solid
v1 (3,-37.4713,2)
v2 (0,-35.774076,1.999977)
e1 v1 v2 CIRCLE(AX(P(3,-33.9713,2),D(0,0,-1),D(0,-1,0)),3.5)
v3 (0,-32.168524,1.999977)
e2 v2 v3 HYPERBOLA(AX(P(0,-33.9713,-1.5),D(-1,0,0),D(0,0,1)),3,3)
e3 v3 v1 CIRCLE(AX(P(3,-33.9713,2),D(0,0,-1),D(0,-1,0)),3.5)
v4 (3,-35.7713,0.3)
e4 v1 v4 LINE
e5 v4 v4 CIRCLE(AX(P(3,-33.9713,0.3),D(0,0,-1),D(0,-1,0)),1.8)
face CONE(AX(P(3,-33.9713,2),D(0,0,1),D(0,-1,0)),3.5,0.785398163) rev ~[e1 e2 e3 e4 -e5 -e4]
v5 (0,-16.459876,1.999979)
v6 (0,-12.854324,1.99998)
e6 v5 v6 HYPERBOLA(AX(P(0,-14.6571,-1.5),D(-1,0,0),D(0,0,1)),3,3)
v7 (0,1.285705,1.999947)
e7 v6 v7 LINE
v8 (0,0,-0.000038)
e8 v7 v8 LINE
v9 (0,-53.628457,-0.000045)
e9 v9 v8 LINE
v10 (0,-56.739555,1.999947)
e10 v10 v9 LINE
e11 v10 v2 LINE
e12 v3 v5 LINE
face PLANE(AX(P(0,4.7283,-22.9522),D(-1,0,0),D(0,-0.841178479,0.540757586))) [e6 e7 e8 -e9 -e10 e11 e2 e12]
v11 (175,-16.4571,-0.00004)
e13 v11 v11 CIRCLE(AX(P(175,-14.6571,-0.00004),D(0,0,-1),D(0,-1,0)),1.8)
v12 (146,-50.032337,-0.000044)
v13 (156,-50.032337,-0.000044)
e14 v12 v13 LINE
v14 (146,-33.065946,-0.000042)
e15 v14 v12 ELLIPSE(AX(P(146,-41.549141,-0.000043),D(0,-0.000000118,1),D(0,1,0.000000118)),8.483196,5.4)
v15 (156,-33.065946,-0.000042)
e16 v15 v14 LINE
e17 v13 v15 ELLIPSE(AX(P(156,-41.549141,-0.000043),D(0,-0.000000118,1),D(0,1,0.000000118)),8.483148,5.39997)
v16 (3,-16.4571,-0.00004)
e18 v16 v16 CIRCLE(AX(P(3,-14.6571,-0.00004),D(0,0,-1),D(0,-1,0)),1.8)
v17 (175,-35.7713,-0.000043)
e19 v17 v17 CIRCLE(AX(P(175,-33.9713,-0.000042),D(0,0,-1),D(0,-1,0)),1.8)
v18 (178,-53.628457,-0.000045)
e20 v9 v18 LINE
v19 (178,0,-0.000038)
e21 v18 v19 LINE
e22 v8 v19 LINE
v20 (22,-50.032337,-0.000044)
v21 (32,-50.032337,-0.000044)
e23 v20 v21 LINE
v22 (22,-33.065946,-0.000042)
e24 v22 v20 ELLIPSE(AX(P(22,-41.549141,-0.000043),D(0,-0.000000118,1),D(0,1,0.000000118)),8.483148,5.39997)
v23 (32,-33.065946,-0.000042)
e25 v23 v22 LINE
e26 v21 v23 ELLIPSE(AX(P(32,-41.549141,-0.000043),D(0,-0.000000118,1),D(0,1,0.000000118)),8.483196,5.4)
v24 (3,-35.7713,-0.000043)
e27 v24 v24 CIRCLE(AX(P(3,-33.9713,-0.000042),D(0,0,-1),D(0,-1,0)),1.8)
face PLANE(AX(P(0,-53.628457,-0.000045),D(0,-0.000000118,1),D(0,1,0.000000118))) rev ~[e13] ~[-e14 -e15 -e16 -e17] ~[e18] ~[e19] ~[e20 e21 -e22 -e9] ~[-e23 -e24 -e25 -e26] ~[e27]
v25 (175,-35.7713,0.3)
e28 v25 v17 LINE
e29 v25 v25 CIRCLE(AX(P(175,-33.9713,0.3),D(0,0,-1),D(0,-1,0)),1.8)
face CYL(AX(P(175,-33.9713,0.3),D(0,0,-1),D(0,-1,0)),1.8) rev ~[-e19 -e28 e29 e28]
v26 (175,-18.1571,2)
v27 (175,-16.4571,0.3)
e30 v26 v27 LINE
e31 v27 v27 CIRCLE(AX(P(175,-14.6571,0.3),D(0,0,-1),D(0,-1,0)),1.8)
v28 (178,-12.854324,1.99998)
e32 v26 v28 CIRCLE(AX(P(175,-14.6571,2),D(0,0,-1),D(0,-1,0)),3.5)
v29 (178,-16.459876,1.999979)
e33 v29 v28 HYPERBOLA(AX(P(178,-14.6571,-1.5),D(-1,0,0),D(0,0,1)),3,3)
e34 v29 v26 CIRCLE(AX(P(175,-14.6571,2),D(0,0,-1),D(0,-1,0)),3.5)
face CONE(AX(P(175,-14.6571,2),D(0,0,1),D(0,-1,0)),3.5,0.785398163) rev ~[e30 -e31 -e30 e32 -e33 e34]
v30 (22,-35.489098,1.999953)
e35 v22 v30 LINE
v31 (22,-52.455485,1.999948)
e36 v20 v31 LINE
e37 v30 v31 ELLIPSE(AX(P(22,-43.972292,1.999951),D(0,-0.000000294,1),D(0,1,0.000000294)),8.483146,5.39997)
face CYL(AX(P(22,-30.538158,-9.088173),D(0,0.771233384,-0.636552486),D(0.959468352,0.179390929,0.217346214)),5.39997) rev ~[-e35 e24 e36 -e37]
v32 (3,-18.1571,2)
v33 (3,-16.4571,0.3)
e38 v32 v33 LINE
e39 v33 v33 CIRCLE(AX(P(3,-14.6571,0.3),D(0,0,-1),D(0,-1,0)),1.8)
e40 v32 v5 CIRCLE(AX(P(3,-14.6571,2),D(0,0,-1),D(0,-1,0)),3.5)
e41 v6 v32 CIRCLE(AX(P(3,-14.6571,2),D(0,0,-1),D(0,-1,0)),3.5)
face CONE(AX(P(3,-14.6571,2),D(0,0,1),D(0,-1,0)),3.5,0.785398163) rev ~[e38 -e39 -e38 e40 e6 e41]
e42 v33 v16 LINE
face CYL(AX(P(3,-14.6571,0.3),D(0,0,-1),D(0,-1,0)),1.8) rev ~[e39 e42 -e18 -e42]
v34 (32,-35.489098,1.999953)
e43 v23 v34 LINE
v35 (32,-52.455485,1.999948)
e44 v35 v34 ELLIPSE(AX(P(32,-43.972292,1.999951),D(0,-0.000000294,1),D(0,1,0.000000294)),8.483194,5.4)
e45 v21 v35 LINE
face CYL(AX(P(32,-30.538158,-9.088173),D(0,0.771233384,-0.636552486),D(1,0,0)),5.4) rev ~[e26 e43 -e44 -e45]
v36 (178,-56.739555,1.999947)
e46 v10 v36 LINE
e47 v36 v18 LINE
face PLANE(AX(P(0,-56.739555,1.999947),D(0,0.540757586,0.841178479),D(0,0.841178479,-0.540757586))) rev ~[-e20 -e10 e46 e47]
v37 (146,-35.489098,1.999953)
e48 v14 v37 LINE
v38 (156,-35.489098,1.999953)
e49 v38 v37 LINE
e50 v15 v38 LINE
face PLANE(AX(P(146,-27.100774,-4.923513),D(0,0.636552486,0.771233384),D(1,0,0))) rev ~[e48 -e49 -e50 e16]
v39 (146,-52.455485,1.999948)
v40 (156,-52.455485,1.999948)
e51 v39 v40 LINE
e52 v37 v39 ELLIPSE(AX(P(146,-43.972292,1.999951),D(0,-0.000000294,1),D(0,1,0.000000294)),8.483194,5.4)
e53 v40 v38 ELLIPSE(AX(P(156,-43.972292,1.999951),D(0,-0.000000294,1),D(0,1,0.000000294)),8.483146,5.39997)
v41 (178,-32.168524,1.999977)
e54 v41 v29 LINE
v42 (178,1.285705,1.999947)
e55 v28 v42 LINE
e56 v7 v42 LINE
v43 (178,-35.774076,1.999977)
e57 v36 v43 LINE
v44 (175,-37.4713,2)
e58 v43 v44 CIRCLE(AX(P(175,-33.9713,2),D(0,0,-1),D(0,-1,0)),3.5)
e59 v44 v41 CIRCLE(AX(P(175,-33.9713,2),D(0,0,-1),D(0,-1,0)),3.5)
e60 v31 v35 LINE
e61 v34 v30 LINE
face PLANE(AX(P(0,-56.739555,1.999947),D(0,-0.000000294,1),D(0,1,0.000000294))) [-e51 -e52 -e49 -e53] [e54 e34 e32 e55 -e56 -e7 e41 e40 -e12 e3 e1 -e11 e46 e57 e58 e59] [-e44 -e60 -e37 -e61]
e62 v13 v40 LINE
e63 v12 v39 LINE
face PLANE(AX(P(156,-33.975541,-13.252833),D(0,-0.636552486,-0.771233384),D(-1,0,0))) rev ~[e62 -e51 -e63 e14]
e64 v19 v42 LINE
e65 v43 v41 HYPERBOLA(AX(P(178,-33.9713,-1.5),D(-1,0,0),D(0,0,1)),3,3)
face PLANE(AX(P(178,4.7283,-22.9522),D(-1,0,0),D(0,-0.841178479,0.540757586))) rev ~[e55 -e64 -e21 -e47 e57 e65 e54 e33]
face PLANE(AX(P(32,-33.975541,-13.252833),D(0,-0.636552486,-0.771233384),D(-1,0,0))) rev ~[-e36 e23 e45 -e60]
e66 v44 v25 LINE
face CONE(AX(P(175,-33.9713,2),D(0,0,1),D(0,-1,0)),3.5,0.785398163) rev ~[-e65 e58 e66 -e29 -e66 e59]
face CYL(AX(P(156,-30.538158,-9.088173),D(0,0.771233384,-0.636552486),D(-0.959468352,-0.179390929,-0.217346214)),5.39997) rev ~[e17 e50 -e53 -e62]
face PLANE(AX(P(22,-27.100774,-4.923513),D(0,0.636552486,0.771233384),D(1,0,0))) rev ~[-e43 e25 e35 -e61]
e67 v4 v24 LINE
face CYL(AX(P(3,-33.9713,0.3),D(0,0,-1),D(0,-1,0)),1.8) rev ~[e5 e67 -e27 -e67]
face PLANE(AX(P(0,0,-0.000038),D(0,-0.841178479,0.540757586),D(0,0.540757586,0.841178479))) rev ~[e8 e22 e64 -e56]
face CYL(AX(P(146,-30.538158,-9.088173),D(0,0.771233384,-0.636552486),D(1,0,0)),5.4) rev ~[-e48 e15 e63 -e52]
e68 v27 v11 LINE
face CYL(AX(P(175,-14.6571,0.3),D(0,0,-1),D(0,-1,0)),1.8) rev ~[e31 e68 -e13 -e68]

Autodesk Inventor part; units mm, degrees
ref_plane "YZ Plane" through (0, 0, 0) normal (1, 0, 0) x (0, 1, 0)
ref_plane "XZ Plane" through (0, 0, 0) normal (0, 1, 0) x (-1, 0, 0)
ref_plane "Work Plane1" through (0, 4.7283, -22.9522) normal (-1, 0, 0) x (0, -0.8411785, 0.5407576)
sketch "Sketch1" plane through (0, 4.7283, -22.9522) normal (-1, 0, 0) x (0, -0.8411785, 0.5407576)
  line L0 (-61.5, -16.75) -> (-59.949, -16.75) projected
  line L1 (61.5, -12.25) -> (61.5, -16.75) projected
  line L2 (61.5, -16.75) -> (65.5, -16.75) projected
  line L3 (65.5, -16.75) -> (65.5, -20.25) projected
  line L4 (65.5, -20.25) -> (79.5, -20.25) projected
  line L5 (79.5, -20.25) -> (65.5, -11.25) projected
  line L6 (65.5, -11.25) -> (65.5, -12.25) projected
  line L7 (65.5, -12.25) -> (61.5, -12.25) projected
  line L8 (16.3889, 16.75) -> (16.3889, 18.75) projected
  line L9 (14.3494, 18.75) -> (16.3889, 18.75)
  line L10 (65.1985, -12.25) -> (12.6206, 21.5501)
  line L11 (16.3889, 16.75) -> (16.3889, 19.1276)
  arc A0 (-61.5, -15.199) -> (-59.949, -16.75) centre (-58.75, -14) ccw projected
  line L12 (-61.5, -15.199) -> (-61.5, -16.75) projected
  arc A1 (-57.551, -16.75) -> (-61.5, -12.801) centre (-58.75, -14) ccw projected
  line L13 (-57.551, -16.75) -> (-36.699, -16.75) projected
  arc A2 (-34.301, -16.75) -> (-36.699, -16.75) centre (-35.5, -14) ccw projected
  line L14 (-34.301, -16.75) -> (61.5, -16.75) projected
  line L15 (61.5, -16.75) -> (61.5, -12.25) projected
  line L16 (61.5, -12.25) -> (16.3889, 16.75) projected
  line L17 (16.3889, 16.75) -> (-61.5, 16.75) projected
  line L18 (-61.5, 16.75) -> (-61.5, -12.801) projected
  point P0 (15.3691, 18.75)
  dimension "d14" = 2
  dimension "d15" = 2
ref_plane "Work Plane2" through (178, -56.0619, -70.2985) normal (1, 0, 0) x (0, 0.8411785, -0.5407576)
extrude "Extrusion1" add sketch "Sketch1" against normal up to surface (178 mm away) contours L16 L8 L11 L10 L7
sketch "Sketch2" plane through (0, -56.7396, 2) normal (0, 0, 1) x (1, 0, 0)
  circle A0 centre (3, 22.7682) radius 2.5 projected
  circle A1 centre (3, 42.0825) radius 2.5 projected
  line L0 (0, 3.1111) -> (0, 56.7396) projected
  line L1 (0, 3.1111) -> (6, 3.1111) projected
  line L2 (6, 56.7396) -> (6, 3.1111) projected
  line L3 (0, 56.7396) -> (6, 56.7396) projected
  circle A2 centre (175, 22.7682) radius 2.5 projected
  circle A3 centre (175, 42.0825) radius 2.5 projected
  line L4 (178, 3.1111) -> (178, 56.7396) projected
  line L5 (178, 56.7396) -> (172, 56.7396) projected
  line L6 (172, 56.7396) -> (172, 3.1111) projected
  line L7 (178, 3.1111) -> (172, 3.1111) projected
hole "Hole1" at (3, -14.6571, 2) at (3, -33.9713, 2) at (175, -33.9713, 2) at (175, -14.6571, 2) direction (0, 0, -1) diameter 3.6 end through all countersink diameter 7 countersink angle 90 clearance for "Countersunk Flat Head Screw ISO 2009/7046" size "M3" standard "ISO"
ref_plane "Work Plane3" through (22, -30.5397, -9.0869) normal (0, -0.7712334, 0.6365525) x (1, 0, 0)
sketch "Sketch3" plane through (22, -30.5397, -9.0869) normal (0, -0.7712334, 0.6365525) x (1, 0, 0)
  line L0 (-9.9215, 5.4518) -> (-9.9215, -5.4534)
  spline S0 degree 3 poles (-9.9215, -5.4534) (-9.9222, -5.5772) (-9.8204, -5.8209) (-9.5772, -5.9222) (-9.4534, -5.9215) knots 0 0 0 0 0.5 1 1 1 1
  line L1 (-9.4534, -5.9215) -> (19.4534, -5.9215)
  spline S1 degree 3 poles (19.4534, -5.9215) (19.5775, -5.9222) (19.8219, -5.82) (19.9222, -5.5758) (19.9215, -5.4518) knots 0 0 0 0 0.5 1 1 1 1
  line L2 (19.9215, -5.4518) -> (19.9215, 5.4534)
  spline S2 degree 3 poles (19.9215, 5.4534) (19.9222, 5.5775) (19.82, 5.8219) (19.5758, 5.9222) (19.4518, 5.9215) knots 0 0 0 0 0.5 1 1 1 1
  line L3 (19.4518, 5.9215) -> (-9.4534, 5.9215)
  spline S3 degree 3 poles (-9.4534, 5.9215) (-9.5775, 5.9222) (-9.8219, 5.82) (-9.9222, 5.5758) (-9.9215, 5.4518) knots 0 0 0 0 0.5 1 1 1 1
  circle A0 centre (-8.3791, -4.3791) radius 0.5
  circle A1 centre (-8.3791, 4.3791) radius 0.5
  circle A2 centre (18.3791, 4.3791) radius 0.5
  circle A3 centre (18.3791, -4.3791) radius 0.5
  arc A4 (5.2617, -1.4512) -> (5.1811, -1.5218) centre (5.2771, -1.55) ccw
  arc A5 (5.1811, 1.5218) -> (5.1811, -1.5218) centre (0, 0) ccw
  arc A6 (5.1811, 1.5218) -> (5.2617, 1.4512) centre (5.2771, 1.55) ccw
  arc A7 (5.2617, 1.4512) -> (5.3414, 1.519) centre (5.2463, 1.55) ccw
  arc A8 (5.3414, -1.519) -> (5.3414, 1.519) centre (10, 0) ccw
  arc A9 (5.3414, -1.519) -> (5.2617, -1.4512) centre (5.2463, -1.55) ccw
  line L4 (143.9215, 5.4518) -> (143.9215, -5.4534)
  spline S4 degree 3 poles (143.4534, 5.9215) (143.5775, 5.9222) (143.8219, 5.82) (143.9222, 5.5758) (143.9215, 5.4518) knots 0 0 0 0 0.5 1 1 1 1
  line L5 (114.5482, 5.9215) -> (143.4534, 5.9215)
  spline S5 degree 3 poles (114.0785, 5.4534) (114.0778, 5.5775) (114.18, 5.8219) (114.4242, 5.9222) (114.5482, 5.9215) knots 0 0 0 0 0.5 1 1 1 1
  line L6 (114.0785, -5.4518) -> (114.0785, 5.4534)
  spline S6 degree 3 poles (114.5466, -5.9215) (114.4225, -5.9222) (114.1781, -5.82) (114.0778, -5.5758) (114.0785, -5.4518) knots 0 0 0 0 0.5 1 1 1 1
  line L7 (143.4534, -5.9215) -> (114.5466, -5.9215)
  spline S7 degree 3 poles (143.9215, -5.4534) (143.9222, -5.5772) (143.8204, -5.8209) (143.5772, -5.9222) (143.4534, -5.9215) knots 0 0 0 0 0.5 1 1 1 1
  circle A10 centre (142.3791, -4.3791) radius 0.5
  circle A11 centre (142.3791, 4.3791) radius 0.5
  circle A12 centre (115.6209, 4.3791) radius 0.5
  circle A13 centre (115.6209, -4.3791) radius 0.5
  arc A14 (128.8189, -1.5218) -> (128.7383, -1.4512) centre (128.7229, -1.55) ccw
  arc A15 (128.7383, -1.4512) -> (128.6586, -1.519) centre (128.7537, -1.55) ccw
  arc A16 (128.6586, 1.519) -> (128.6586, -1.519) centre (124, 0) ccw
  arc A17 (128.6586, 1.519) -> (128.7383, 1.4512) centre (128.7537, 1.55) ccw
  arc A18 (128.7383, 1.4512) -> (128.8189, 1.5218) centre (128.7229, 1.55) ccw
  arc A19 (128.8189, -1.5218) -> (128.8189, 1.5218) centre (134, 0) ccw
  circle A20 centre (10, 0) radius 5.4
  circle A21 centre (124, 0) radius 5.4
  line L8 (0, 5.4) -> (10, 5.4)
  line L9 (10, -5.4) -> (0, -5.4)
  line L10 (124, 5.4) -> (134, 5.4)
  line L11 (134, -5.4) -> (124, -5.4)
  point P0 (-22, 26.4483)
  dimension "d9" = 10.8
  dimension "d10" = 10.8
extrude "Extrusion2" cut sketch "Sketch3" along normal blind 78.25 contours A9 A8 A7 A6 A5 A20 A4 | A4 A5 A20 A6 A7 A8 A9 | A20 L9 A5 | A5 A20 | A5 L8 A20 | A19 A21 A18 A17 A16 A15 A14 | A14 A15 A16 A17 A18 A19 A21 | A21 A19 | A19 L11 A21 | A19 A21 L10
properties part number "front" material "Aluminum 6061"
